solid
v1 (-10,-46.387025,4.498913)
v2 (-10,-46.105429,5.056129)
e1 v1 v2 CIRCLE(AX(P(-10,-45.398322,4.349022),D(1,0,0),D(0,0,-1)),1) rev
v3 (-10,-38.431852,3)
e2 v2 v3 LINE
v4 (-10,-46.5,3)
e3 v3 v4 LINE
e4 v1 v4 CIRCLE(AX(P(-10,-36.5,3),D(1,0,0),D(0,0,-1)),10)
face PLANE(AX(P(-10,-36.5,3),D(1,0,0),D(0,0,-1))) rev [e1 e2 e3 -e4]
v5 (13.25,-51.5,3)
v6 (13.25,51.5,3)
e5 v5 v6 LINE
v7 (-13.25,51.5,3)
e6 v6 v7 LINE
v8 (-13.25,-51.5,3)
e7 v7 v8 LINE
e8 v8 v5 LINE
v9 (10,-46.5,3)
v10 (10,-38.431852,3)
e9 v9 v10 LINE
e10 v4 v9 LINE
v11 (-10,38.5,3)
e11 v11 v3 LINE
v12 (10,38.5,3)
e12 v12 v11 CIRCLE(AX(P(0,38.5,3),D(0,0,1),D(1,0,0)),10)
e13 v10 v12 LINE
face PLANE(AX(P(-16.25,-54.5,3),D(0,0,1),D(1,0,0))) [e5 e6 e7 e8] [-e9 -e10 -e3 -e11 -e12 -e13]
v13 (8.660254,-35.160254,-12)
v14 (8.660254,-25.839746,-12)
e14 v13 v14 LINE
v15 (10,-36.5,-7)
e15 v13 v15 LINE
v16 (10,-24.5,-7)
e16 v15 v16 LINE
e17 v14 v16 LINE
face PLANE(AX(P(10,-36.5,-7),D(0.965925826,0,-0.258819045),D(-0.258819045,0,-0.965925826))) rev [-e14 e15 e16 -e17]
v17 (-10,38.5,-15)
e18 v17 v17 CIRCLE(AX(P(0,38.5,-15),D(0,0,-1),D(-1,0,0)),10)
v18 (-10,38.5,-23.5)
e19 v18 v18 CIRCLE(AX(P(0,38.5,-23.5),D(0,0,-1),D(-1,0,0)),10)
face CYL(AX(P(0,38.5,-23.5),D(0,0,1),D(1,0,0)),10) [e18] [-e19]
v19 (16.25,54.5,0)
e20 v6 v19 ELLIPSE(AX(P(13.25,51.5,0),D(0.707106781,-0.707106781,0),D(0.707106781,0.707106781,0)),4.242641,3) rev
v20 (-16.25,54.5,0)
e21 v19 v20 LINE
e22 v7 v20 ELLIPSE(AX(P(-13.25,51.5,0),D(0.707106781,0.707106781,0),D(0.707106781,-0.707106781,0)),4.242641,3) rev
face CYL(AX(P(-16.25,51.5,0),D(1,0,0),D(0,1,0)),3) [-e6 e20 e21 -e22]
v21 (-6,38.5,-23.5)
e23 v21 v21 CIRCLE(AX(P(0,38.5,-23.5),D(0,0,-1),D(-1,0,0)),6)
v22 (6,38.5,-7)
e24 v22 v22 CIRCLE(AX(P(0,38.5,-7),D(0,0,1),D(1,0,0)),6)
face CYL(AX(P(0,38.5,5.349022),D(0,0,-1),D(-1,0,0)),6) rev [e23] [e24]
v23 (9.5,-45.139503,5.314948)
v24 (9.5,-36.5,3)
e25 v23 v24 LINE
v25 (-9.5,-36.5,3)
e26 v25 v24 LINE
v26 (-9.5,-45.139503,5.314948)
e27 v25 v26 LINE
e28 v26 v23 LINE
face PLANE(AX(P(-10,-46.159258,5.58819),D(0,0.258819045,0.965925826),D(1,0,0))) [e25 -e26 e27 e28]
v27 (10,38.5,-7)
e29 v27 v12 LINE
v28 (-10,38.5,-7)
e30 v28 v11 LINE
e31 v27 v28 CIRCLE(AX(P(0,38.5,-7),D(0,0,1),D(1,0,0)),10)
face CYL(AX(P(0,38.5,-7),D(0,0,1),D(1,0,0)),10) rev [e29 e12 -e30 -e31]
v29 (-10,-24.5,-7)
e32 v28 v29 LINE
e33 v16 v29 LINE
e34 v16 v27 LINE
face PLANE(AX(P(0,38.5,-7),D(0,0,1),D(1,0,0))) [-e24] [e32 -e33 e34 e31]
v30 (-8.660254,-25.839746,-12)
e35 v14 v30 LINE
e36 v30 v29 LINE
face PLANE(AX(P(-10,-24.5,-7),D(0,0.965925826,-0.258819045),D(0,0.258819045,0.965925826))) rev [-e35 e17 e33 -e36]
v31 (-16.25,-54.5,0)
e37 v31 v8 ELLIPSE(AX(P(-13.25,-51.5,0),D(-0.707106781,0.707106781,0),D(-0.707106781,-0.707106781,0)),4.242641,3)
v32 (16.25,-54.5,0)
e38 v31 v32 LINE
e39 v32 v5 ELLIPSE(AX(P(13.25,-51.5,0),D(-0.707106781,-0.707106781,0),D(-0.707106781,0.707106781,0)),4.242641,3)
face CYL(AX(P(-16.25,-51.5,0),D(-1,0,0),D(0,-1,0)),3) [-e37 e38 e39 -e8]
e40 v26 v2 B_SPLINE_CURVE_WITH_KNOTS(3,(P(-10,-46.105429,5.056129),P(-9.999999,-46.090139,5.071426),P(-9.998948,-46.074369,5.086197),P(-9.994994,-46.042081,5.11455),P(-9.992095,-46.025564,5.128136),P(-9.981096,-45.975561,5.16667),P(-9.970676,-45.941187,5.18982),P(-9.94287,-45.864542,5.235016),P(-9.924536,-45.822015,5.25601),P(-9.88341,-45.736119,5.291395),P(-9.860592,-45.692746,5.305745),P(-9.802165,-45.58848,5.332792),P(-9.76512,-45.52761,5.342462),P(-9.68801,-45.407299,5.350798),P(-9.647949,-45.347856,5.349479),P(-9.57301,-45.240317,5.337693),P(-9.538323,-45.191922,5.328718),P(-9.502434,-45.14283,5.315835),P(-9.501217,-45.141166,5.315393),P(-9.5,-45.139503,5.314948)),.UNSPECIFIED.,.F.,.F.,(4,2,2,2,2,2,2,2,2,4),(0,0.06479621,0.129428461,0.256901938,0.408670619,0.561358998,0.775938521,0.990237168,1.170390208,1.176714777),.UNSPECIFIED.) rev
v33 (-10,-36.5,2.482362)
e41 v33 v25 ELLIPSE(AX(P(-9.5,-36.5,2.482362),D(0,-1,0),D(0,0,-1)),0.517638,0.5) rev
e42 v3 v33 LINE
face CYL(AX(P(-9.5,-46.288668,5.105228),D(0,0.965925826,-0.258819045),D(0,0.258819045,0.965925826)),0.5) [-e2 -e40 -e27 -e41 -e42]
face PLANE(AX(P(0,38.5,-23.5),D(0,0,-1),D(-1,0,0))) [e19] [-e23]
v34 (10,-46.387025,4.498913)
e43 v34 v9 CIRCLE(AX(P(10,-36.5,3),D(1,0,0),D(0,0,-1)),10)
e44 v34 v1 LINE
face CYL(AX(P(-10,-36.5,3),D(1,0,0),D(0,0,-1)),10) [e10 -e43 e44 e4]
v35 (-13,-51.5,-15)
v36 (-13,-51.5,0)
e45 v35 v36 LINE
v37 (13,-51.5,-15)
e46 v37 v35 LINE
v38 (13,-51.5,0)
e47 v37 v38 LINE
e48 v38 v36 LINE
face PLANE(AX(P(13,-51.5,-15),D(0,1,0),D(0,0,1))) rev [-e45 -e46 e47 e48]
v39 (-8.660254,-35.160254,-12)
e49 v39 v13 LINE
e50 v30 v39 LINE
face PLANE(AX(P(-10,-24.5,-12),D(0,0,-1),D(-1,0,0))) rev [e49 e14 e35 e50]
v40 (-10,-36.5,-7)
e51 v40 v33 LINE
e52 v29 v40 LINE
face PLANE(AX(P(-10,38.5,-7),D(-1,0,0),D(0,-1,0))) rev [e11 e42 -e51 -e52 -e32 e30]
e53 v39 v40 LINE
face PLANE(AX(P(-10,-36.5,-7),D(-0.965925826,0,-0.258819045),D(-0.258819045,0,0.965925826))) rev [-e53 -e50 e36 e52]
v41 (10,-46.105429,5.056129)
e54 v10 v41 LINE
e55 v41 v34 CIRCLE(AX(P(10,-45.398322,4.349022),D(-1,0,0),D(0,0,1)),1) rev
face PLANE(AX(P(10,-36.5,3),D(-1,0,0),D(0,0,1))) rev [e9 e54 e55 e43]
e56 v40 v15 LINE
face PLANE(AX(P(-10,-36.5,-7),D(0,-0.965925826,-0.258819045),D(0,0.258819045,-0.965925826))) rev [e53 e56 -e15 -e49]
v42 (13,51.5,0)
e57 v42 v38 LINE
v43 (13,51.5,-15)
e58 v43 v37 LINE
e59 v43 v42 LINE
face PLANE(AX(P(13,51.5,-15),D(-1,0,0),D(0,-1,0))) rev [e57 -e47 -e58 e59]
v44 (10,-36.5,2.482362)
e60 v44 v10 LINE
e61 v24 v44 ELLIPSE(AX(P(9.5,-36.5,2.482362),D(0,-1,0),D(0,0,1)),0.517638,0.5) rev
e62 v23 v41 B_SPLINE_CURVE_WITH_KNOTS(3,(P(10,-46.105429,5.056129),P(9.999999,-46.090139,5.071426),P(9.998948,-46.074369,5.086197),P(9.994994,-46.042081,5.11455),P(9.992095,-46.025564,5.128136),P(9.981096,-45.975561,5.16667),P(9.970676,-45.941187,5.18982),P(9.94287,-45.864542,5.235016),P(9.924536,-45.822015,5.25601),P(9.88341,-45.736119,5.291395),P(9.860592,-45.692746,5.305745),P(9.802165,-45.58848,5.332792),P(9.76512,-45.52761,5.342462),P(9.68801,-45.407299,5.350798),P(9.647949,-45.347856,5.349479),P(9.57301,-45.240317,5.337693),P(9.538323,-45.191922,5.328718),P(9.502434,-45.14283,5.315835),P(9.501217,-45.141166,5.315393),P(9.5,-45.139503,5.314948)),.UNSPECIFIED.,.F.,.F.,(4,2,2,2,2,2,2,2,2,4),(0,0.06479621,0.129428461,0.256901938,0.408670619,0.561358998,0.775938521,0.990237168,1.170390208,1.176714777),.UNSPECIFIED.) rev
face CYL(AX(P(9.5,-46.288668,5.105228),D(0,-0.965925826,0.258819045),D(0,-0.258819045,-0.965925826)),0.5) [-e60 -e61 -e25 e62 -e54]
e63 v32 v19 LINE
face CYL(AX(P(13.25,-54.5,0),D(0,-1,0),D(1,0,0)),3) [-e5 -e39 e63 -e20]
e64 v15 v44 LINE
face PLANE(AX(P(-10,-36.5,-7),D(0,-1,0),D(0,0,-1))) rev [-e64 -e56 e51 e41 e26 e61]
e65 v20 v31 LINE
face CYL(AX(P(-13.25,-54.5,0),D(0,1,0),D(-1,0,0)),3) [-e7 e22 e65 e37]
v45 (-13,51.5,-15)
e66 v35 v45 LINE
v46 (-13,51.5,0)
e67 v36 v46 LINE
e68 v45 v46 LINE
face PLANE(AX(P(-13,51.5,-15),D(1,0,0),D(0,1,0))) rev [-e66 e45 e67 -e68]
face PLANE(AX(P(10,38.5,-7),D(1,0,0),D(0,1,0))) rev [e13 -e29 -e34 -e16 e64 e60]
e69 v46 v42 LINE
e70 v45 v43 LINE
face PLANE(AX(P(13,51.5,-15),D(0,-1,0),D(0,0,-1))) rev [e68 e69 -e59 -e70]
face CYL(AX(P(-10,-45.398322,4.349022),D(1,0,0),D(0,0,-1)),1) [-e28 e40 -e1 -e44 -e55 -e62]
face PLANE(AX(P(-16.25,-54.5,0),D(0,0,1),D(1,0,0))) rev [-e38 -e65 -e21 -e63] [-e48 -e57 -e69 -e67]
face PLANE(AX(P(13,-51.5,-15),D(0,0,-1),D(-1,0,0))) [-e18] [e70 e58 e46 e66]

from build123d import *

# Parameters (mm, degrees)
SKETCH_1_W          = 32.5
SKETCH_1_H          = 109
EXTRUDE_1_DEPTH     = 3
FILLET_2_R          = 3
SKETCH_2_W          = 26
SKETCH_2_H          = 103
EXTRUDE_2_DEPTH     = 15
SKETCH_4_R          = 10
EXTRUDE_3_DEPTH     = 8.5
CUT_EXTRUDE_1_DEPTH = 10
SKETCH_6_W          = 20
SKETCH_6_H          = 12
CUT_EXTRUDE_2_DEPTH = 5
CUT_EXTRUDE_2_DRAFT = -15
SKETCH_7_W          = 20
SKETCH_7_H          = 10
REVOLVE_1_ANGLE     = 15
FILLET_START        = -47
FILLET_3_DEPTH      = 12
FILLET_START_2      = -11
FILLET_3_2_DEPTH    = 22
SKETCH_8_R          = 6
CUT_EXTRUDE_3_DEPTH = 64.76973092


with BuildPart() as part:
    # 草圖1 → 伸長1 (new body)
    with BuildSketch(Plane.XY):
        Rectangle(SKETCH_1_W, SKETCH_1_H)
    extrude(amount=EXTRUDE_1_DEPTH)

    # 圓角2
    fillet_2_edges = [part.edges().sort_by_distance(p)[0] for p in [
        (-16.25, 0, 3),
        (16.25, 0, 3),
        (0, -54.5, 3),
        (0, 54.5, 3),
    ]]
    fillet(fillet_2_edges, radius=FILLET_2_R - 0.0001)  # a hair under: the kernel refuses the full size

    # 草圖2 → 伸長2 (add)
    with BuildSketch(Plane(origin=(0, 0, 0), x_dir=(-1, 0, 0), z_dir=(0, 0, -1))):
        Rectangle(SKETCH_2_W, SKETCH_2_H)
    extrude(amount=EXTRUDE_2_DEPTH)

    # 草圖4 → 伸長3 (add)
    with BuildSketch(Plane(origin=(0, 0, -15), x_dir=(-1, 0, 0), z_dir=(0, 0, -1))):
        with Locations((0, 38.5)):
            Circle(SKETCH_4_R)
    extrude(amount=EXTRUDE_3_DEPTH)

    # 草圖5 → 除料-伸長1 (cut)
    with BuildSketch(Plane.XY.offset(3)):
        with BuildLine():
            Line((-10, 38.5), (-10, -36.5))
            Line((-10, -36.5), (10, -36.5))
            Line((10, -36.5), (10, 38.5))
            ThreePointArc((10, 38.5), (0, 48.5), (-10, 38.5))
        make_face()
    extrude(amount=-CUT_EXTRUDE_1_DEPTH, mode=Mode.SUBTRACT)


with BuildPart() as cut_extrude_2_tool:
    # 草圖6 → 除料-伸長2 (with draft: the straight prism first)
    with BuildSketch(Plane.XY.offset(-7)):
        with Locations((0, -30.5)):
            Rectangle(SKETCH_6_W, SKETCH_6_H)
    extrude(amount=-CUT_EXTRUDE_2_DEPTH)
    # 除料-伸長2: the draft: its side faces are tilted about the plane it starts from
    cut_extrude_2_sides = [cut_extrude_2_tool.faces().sort_by_distance(p)[0] for p in [
        (0, -36.5, -9.5),
        (10, -30.5, -9.5),
        (0, -24.5, -9.5),
        (-10, -30.5, -9.5),
    ]]
    draft(cut_extrude_2_sides, Plane.XY.offset(-7), CUT_EXTRUDE_2_DRAFT)


with BuildPart() as part_1:
    add(part.part)

    # 除料-伸長2: cut by cut_extrude_2_tool
    add(cut_extrude_2_tool.part, mode=Mode.SUBTRACT)

    # 草圖7 → 旋轉1 (revolve)
    with BuildSketch(Plane.XY.offset(3)):
        with Locations((0, -41.5)):
            Rectangle(SKETCH_7_W, SKETCH_7_H)
    revolve(axis=Axis((-10, -36.5, 3), (-1, 0, 0)), revolution_arc=REVOLVE_1_ANGLE)

    # 圓角3: read off the stored shape, not the designer's step
    # 圓角3 outline → 圓角3 (cut)
    with BuildSketch(Plane(origin=(0, 0, 0), x_dir=(1, 0, 0), z_dir=(0, 0.9659258262890682, -0.2588190451025211)).offset(FILLET_START)):
        with BuildLine():
            ThreePointArc((10, 7.049117667), (9.853553391, 6.695564276), (9.5, 6.549117667))
            Line((9.5, 6.549117667), (10, 6.549117667))
            Line((10, 6.549117667), (10, 7.049117667))
        make_face()
        with BuildLine():
            ThreePointArc((-9.5, 6.549117667), (-9.853553391, 6.695564276), (-10, 7.049117667))
            Line((-10, 7.049117667), (-10, 6.549117667))
            Line((-10, 6.549117667), (-9.5, 6.549117667))
        make_face()
    extrude(amount=FILLET_3_DEPTH, mode=Mode.SUBTRACT)

    # Fillet 3 2 outline → Fillet 3 2 (cut)
    with BuildSketch(Plane.YZ.offset(FILLET_START_2)):
        with BuildLine():
            ThreePointArc((-46.387024756, 4.498913432), (-45.945734853, 5.185884966), (-45.139503235, 5.314947915))
            Line((-45.139503235, 5.314947915), (-46.159258263, 5.588190451))
            ThreePointArc((-46.159258263, 5.588190451), (-46.288305577, 5.04672273), (-46.387024756, 4.498913432))
        make_face()
    extrude(amount=FILLET_3_2_DEPTH, mode=Mode.SUBTRACT)

    # 草圖8 → 除料-伸長3 (cut, through all)
    with BuildSketch(Plane(origin=(0, 0, -23.5), x_dir=(-1, 0, 0), z_dir=(0, 0, -1))):
        with Locations((0, 38.5)):
            Circle(SKETCH_8_R)
    extrude(amount=-CUT_EXTRUDE_3_DEPTH, mode=Mode.SUBTRACT)


solid = part_1.part
